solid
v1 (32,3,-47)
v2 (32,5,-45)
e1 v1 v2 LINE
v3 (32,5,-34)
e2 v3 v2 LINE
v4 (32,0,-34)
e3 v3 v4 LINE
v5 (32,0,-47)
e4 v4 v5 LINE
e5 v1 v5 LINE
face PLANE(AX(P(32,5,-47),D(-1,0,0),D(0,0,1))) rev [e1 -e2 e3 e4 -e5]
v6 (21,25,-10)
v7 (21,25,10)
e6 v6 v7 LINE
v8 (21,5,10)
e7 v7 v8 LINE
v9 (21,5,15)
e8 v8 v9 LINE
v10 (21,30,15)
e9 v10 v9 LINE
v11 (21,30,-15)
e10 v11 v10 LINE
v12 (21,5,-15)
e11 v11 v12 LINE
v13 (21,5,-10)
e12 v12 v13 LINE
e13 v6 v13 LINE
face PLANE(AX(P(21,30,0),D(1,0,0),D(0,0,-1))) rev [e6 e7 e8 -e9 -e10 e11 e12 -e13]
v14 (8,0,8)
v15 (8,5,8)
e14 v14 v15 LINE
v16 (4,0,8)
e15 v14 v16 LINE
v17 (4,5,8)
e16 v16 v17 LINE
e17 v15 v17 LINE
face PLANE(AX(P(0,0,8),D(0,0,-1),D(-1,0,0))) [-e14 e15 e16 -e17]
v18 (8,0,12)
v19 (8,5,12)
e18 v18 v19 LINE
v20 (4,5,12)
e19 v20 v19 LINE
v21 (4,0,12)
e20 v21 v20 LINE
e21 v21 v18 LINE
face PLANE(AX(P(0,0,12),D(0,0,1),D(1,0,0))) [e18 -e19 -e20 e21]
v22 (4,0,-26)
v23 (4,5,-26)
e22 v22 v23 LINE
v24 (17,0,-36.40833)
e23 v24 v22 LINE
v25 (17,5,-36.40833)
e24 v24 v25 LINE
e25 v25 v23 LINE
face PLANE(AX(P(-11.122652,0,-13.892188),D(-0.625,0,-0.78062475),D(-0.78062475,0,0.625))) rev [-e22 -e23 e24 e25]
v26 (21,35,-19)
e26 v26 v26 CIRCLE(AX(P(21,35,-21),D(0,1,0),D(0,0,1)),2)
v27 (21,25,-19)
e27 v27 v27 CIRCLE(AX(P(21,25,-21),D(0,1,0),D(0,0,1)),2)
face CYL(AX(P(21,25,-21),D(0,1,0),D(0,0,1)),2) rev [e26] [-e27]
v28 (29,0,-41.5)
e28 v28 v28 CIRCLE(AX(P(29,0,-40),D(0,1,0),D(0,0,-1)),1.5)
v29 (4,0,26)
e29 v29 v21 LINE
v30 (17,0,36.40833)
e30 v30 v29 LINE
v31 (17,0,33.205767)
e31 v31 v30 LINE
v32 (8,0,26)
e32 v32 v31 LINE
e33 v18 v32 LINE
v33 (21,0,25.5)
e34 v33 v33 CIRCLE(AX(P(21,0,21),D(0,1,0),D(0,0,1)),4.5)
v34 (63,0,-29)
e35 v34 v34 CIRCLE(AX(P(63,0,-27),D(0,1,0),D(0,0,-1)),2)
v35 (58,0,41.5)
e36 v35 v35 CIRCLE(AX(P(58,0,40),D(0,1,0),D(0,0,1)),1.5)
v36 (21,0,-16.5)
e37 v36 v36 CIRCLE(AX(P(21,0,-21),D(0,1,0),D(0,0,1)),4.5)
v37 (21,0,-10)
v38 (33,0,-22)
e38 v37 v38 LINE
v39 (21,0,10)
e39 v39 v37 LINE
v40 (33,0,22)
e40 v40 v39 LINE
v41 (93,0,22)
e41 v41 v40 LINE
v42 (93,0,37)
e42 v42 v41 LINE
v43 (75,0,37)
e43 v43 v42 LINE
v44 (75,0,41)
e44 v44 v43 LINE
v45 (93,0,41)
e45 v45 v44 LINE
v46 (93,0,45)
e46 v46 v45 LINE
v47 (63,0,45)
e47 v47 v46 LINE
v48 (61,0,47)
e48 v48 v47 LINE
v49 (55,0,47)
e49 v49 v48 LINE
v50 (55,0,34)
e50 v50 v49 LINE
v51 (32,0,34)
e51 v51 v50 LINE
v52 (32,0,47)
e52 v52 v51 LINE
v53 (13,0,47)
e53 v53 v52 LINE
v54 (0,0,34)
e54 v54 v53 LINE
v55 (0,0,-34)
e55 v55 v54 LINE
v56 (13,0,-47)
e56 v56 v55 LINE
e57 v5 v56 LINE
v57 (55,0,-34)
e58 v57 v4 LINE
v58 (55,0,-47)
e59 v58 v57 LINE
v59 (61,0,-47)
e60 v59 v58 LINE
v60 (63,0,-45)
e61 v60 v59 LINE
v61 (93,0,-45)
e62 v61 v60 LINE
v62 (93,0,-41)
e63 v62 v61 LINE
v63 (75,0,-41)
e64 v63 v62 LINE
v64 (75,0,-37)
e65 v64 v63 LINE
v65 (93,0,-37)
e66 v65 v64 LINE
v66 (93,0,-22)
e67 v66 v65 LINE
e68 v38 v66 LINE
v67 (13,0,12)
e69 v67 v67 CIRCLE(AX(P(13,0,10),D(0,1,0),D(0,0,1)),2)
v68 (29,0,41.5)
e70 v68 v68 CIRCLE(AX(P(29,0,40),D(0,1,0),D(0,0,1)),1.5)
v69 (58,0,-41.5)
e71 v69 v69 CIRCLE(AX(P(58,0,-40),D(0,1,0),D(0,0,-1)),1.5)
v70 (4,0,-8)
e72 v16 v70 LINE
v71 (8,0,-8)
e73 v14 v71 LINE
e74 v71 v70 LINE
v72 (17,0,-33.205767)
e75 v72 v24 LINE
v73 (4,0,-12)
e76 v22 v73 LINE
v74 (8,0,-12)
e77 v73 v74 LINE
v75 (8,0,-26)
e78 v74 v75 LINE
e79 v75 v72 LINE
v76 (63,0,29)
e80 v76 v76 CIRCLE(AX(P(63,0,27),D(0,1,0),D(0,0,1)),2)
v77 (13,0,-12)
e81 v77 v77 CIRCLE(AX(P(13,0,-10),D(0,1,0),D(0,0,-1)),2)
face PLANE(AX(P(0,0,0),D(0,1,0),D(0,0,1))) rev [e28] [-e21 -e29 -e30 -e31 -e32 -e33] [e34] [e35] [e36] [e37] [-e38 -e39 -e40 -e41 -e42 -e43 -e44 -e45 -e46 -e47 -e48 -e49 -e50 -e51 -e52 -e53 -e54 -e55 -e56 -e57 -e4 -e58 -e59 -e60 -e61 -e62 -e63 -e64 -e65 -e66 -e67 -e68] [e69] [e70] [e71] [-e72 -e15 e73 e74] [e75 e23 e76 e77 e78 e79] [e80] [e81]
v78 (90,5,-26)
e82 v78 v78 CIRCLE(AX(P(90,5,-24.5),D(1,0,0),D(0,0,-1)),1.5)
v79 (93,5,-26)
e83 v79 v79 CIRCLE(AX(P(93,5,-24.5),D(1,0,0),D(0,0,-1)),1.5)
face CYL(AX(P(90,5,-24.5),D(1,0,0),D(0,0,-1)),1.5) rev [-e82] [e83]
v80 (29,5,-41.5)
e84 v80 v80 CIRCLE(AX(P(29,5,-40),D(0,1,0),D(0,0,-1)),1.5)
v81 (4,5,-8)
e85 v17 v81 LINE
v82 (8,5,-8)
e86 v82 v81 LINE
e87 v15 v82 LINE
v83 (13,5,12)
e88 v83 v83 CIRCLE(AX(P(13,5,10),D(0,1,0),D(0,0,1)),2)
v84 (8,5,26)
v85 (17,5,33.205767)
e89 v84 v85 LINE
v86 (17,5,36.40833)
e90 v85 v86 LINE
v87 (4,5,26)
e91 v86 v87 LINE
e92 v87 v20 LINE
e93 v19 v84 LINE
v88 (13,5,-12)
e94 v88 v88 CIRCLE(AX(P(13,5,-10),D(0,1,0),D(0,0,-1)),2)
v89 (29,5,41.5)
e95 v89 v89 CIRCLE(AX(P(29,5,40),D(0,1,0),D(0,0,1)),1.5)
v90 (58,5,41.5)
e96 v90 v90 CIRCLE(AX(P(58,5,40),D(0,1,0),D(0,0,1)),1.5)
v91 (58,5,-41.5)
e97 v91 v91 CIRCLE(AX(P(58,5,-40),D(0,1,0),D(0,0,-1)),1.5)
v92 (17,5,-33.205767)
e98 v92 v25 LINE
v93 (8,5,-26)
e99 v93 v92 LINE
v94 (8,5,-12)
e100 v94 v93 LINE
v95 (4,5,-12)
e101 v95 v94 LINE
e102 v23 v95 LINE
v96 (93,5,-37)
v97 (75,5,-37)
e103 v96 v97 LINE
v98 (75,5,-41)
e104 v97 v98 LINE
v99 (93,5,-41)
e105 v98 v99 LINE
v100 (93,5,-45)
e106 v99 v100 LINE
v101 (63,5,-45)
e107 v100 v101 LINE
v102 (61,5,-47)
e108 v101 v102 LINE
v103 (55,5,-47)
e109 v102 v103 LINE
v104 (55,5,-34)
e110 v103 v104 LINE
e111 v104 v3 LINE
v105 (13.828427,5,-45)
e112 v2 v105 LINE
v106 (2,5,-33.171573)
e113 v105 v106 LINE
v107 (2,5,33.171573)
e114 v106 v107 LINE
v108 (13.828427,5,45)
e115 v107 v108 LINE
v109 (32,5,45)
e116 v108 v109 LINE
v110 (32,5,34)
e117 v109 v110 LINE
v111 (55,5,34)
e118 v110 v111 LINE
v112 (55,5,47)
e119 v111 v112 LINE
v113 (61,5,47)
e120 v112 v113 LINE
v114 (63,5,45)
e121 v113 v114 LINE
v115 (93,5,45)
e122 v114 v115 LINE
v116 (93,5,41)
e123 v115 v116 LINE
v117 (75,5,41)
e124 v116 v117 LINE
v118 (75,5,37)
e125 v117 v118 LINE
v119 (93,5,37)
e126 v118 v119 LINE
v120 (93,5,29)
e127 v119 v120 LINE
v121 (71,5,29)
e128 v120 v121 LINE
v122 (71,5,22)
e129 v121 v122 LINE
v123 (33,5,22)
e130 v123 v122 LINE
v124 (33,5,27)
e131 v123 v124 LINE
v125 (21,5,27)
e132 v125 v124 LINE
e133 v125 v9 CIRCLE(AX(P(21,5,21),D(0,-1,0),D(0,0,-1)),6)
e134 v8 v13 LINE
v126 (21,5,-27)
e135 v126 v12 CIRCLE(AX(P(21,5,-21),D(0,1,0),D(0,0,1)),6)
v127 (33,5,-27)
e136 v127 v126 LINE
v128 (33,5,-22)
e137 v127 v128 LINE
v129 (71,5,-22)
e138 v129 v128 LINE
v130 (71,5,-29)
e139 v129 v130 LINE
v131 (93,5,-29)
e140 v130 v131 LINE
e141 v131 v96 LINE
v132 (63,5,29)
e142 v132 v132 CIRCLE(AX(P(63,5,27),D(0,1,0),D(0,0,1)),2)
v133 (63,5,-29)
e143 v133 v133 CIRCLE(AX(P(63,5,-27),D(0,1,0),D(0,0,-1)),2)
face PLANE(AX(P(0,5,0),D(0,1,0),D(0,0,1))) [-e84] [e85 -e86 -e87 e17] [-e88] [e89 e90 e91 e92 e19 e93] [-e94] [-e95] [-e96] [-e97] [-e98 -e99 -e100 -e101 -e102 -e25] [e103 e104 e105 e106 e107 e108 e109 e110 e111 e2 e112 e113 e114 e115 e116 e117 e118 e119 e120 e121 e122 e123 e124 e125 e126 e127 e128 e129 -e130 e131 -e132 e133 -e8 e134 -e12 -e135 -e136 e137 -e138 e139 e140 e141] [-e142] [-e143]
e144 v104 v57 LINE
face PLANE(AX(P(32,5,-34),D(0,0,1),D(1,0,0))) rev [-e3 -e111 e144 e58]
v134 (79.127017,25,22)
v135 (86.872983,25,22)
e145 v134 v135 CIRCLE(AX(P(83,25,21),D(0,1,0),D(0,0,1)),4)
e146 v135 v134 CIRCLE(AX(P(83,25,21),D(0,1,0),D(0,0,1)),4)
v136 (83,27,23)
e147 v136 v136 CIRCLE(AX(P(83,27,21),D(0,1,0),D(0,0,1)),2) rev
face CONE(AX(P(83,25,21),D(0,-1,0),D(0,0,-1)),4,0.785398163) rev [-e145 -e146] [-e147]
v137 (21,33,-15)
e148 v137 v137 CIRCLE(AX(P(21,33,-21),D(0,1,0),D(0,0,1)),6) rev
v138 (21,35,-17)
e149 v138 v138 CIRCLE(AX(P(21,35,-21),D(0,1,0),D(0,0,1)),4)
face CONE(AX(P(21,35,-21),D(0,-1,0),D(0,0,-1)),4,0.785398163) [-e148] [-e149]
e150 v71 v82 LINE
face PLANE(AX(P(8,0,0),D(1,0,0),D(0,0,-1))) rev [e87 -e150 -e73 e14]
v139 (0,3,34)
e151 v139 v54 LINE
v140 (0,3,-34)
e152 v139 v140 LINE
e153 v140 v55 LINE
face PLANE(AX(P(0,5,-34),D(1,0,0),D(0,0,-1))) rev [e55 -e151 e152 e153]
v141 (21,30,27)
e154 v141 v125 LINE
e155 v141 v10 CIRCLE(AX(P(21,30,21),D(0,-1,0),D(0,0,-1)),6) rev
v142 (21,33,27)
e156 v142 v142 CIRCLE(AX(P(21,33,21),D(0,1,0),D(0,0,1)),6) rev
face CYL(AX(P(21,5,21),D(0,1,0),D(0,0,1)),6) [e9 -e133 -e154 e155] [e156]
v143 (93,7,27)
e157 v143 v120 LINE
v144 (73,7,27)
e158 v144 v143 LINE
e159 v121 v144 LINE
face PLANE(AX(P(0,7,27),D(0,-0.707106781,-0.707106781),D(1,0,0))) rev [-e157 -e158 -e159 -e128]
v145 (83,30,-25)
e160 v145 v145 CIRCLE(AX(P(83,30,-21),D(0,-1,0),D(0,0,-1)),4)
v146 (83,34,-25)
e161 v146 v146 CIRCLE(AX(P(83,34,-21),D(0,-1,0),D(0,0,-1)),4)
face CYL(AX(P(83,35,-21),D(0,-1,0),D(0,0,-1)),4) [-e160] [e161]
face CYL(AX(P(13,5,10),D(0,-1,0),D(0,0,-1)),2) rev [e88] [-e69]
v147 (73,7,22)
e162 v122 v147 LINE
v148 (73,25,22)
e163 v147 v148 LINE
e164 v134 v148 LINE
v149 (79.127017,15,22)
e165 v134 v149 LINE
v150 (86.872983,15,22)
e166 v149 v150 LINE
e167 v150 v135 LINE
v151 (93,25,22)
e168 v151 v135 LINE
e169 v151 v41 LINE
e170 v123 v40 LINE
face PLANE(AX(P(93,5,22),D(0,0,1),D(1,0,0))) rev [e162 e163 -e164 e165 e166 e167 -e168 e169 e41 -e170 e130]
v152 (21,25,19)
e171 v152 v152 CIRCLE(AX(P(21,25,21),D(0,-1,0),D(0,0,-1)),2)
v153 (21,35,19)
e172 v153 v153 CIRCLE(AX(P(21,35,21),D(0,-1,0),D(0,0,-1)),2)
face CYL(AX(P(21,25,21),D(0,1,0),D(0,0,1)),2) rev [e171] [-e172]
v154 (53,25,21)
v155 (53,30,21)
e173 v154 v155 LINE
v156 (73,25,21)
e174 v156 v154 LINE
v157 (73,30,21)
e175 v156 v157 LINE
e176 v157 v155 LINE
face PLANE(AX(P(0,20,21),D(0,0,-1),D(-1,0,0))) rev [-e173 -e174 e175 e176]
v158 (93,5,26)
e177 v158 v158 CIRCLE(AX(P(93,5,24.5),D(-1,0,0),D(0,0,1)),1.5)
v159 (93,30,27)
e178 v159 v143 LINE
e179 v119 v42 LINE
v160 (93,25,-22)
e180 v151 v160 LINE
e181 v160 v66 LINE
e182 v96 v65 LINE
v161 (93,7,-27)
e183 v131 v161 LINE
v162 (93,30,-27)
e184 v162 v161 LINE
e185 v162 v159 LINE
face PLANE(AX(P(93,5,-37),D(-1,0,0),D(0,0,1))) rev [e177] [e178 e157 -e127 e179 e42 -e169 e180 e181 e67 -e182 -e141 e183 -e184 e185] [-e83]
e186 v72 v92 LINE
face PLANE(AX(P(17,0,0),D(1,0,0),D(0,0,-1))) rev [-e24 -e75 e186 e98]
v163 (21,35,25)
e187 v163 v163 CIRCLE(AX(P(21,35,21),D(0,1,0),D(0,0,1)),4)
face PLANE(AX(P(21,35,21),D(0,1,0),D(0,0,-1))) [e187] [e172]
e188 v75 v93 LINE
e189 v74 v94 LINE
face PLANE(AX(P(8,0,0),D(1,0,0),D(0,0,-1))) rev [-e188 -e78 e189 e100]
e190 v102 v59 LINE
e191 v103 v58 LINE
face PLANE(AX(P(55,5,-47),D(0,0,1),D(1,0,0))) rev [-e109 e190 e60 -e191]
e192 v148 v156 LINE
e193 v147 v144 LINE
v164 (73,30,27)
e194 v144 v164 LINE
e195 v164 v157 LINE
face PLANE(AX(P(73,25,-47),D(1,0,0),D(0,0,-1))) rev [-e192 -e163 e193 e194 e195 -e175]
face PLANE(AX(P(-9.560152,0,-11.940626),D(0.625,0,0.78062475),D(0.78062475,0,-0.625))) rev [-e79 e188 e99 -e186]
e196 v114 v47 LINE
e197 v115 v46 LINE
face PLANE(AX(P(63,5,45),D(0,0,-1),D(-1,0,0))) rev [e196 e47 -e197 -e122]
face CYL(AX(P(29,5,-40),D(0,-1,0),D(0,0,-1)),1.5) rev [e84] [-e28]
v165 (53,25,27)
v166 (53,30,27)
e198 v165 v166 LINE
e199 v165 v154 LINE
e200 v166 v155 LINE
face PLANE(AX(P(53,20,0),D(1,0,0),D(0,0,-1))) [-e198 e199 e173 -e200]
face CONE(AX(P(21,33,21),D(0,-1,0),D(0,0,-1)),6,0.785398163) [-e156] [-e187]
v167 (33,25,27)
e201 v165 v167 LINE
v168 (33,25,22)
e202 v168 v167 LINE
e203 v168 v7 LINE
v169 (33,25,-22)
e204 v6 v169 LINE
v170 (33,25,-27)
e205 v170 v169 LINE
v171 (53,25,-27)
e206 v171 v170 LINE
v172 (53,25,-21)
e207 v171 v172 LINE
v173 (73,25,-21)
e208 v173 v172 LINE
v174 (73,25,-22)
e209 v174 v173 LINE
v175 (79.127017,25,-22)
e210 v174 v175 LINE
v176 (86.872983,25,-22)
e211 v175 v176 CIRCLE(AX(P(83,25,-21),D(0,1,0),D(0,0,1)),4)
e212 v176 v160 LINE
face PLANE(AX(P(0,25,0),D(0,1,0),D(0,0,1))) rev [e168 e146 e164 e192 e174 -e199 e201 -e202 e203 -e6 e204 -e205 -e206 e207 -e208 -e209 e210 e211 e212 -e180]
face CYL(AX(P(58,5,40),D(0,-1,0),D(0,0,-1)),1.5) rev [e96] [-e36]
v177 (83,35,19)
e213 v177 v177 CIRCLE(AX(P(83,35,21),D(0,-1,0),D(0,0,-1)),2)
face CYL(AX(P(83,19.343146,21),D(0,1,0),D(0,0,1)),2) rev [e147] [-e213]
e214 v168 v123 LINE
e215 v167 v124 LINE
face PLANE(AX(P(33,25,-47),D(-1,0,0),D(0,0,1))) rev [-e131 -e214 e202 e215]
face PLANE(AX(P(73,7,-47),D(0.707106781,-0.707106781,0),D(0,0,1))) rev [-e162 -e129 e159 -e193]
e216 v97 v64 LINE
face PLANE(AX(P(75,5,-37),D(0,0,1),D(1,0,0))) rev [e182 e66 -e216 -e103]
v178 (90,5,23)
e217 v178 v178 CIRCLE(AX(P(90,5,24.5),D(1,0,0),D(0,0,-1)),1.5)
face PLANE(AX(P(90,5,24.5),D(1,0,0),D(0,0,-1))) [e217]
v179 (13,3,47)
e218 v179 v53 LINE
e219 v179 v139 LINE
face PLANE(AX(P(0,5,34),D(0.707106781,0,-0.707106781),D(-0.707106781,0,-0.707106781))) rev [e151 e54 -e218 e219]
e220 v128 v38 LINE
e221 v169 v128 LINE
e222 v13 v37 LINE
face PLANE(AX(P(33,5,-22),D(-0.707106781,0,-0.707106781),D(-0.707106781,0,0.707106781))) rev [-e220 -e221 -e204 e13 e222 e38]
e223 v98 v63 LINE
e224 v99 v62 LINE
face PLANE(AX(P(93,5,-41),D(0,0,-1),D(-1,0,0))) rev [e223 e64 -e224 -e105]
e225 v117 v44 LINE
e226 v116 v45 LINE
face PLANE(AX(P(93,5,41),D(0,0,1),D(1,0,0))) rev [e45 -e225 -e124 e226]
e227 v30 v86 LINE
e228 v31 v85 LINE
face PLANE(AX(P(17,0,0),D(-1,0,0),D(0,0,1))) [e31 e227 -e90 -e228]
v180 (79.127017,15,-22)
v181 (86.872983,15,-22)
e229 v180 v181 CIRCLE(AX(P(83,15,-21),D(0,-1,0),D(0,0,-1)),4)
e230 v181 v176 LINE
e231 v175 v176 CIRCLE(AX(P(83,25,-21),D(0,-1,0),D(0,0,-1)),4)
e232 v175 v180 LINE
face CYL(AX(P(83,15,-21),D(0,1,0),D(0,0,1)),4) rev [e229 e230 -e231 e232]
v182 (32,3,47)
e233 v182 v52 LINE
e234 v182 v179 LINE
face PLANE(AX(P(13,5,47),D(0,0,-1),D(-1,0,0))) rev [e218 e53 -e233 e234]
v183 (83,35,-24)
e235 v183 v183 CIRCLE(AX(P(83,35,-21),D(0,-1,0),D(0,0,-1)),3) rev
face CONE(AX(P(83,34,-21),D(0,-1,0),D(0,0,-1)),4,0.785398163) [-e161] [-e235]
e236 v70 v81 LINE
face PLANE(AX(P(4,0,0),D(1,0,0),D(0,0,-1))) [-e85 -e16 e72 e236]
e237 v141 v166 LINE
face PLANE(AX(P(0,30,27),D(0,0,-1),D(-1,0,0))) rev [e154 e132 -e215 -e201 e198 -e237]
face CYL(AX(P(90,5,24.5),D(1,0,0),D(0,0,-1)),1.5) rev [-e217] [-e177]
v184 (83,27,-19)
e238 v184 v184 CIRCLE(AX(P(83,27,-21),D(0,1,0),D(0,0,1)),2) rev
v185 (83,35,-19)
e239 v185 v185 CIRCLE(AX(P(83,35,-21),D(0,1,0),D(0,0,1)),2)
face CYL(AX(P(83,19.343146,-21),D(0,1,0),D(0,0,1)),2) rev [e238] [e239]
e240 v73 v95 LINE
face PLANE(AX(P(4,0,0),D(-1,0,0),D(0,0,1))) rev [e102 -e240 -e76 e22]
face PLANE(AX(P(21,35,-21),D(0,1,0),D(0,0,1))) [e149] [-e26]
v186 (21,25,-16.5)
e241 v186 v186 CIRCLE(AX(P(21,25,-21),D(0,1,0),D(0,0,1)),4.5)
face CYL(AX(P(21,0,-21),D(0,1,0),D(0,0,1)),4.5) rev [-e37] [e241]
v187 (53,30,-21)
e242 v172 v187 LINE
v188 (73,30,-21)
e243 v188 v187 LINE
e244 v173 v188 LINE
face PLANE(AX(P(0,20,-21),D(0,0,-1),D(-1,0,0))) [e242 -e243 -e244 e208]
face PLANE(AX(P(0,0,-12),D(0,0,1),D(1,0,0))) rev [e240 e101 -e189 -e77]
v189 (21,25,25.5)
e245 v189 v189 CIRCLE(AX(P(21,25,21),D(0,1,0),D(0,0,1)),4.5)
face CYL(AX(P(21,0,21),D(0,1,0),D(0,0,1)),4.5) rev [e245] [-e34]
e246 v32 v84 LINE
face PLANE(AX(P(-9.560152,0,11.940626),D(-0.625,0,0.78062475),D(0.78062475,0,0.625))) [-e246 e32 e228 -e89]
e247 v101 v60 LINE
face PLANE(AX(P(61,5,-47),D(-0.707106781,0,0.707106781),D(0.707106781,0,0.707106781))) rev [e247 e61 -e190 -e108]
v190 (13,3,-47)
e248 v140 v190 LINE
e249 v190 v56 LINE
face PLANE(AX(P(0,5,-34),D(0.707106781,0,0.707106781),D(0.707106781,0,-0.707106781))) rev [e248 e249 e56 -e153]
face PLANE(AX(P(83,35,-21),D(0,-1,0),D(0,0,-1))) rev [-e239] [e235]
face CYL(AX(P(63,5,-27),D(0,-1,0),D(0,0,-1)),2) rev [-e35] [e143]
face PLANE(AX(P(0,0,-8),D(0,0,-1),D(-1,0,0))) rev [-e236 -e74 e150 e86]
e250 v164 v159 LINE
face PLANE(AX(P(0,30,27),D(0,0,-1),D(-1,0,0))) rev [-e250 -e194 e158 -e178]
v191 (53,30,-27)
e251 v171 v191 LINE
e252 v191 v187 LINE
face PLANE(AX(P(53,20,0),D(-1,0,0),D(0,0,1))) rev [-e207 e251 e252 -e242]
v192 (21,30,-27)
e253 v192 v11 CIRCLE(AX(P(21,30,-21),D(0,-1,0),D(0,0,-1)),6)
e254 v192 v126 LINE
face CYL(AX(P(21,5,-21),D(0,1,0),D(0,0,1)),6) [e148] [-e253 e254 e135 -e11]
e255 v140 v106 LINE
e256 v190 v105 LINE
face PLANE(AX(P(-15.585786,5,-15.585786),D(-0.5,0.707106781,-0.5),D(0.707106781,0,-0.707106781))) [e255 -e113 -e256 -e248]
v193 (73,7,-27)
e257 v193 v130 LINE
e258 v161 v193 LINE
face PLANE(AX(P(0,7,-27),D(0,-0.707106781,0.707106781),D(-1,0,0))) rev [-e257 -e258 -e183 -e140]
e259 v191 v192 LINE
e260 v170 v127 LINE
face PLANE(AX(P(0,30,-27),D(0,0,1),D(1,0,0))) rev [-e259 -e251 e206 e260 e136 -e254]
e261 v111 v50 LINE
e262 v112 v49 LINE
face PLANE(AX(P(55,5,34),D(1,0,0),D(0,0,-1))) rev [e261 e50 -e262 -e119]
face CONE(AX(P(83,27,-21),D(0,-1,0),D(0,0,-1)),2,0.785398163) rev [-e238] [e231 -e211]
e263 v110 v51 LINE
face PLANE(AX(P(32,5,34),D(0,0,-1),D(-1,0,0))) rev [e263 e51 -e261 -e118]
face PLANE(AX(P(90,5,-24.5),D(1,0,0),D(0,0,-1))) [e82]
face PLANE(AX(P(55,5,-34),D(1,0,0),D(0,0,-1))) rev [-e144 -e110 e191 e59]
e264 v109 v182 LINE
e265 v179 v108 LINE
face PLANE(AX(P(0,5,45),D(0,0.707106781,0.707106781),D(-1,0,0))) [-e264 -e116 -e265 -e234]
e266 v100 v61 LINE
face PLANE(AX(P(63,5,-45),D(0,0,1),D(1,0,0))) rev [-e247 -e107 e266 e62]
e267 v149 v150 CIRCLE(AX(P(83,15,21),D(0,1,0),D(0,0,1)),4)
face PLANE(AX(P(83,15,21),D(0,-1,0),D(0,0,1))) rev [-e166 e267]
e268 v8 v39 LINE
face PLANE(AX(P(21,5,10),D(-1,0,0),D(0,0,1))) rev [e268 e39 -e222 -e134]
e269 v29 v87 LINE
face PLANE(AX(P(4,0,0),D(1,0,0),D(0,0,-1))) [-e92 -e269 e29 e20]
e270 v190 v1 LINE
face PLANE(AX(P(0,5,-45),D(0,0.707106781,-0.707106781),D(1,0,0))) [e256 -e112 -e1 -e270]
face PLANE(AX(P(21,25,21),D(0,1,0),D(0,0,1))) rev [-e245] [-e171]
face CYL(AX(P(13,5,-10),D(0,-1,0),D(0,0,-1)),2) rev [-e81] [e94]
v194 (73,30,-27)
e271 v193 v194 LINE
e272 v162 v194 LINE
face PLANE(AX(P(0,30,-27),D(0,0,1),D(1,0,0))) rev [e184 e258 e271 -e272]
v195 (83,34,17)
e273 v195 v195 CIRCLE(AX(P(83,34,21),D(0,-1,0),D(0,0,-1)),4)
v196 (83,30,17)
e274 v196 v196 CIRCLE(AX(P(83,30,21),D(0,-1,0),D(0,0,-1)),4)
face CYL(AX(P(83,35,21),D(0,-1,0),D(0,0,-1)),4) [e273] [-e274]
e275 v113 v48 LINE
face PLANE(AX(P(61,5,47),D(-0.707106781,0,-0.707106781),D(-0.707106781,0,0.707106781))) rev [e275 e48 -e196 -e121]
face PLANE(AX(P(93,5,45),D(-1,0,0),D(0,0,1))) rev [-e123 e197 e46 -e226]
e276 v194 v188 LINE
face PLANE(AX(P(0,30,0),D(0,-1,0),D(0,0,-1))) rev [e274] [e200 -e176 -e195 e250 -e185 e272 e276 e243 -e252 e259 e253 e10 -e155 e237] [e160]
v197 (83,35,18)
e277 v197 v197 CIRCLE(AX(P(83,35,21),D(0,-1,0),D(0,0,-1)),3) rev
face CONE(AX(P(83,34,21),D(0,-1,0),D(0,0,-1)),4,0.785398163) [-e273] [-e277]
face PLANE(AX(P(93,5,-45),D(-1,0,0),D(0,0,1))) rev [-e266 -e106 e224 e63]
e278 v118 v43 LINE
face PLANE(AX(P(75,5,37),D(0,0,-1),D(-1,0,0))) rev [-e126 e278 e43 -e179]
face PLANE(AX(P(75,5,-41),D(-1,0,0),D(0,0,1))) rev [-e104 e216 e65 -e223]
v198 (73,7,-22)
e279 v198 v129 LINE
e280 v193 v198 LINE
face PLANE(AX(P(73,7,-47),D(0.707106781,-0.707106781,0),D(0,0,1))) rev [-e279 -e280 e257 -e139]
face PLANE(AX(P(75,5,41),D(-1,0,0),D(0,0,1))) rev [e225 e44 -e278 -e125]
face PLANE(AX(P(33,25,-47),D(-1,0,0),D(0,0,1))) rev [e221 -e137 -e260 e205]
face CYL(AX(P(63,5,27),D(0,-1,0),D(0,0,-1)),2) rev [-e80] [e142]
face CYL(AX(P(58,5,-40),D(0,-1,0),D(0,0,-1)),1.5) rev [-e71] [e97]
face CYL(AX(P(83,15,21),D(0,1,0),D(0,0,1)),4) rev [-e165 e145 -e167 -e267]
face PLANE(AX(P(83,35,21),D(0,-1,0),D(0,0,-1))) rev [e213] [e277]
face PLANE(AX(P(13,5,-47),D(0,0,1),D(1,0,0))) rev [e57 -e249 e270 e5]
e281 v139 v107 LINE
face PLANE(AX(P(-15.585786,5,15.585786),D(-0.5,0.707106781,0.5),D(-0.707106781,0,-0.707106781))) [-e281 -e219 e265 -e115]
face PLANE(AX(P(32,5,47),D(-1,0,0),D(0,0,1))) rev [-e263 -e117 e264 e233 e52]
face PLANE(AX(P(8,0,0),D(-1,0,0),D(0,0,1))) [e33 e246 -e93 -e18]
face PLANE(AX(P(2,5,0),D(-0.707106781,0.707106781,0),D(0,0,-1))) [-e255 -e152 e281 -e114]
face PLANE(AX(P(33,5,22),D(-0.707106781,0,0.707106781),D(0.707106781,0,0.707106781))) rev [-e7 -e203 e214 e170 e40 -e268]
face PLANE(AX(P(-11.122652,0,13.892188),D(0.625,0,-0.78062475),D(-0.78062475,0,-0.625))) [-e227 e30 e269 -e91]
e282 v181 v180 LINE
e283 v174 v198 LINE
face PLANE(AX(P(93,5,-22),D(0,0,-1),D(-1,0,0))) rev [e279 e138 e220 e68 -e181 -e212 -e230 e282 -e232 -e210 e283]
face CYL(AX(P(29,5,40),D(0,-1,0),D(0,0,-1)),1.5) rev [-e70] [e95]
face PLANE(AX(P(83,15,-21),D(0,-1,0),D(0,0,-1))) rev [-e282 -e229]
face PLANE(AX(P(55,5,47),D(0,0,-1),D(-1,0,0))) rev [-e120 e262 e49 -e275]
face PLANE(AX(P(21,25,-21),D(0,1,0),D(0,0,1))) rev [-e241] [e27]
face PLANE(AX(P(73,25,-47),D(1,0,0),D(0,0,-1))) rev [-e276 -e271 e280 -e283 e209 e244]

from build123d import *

# Parameters (mm, degrees)
SKETCH1_R           = 2
SKETCH1_R_2         = 1.5
BOSS_EXTRUDE1_DEPTH = 5
SKETCH2_W           = 4
SKETCH2_H           = 16
CUT_EXTRUDE1_DEPTH  = 5
BOSS_EXTRUDE3_DEPTH = 25
SKETCH4_W           = 72
SKETCH4_H           = 54
BOSS_EXTRUDE4_DEPTH = 5
SKETCH5_W           = 40
SKETCH5_H           = 20
CUT_EXTRUDE2_DEPTH  = 123.576506721
SKETCH6_W           = 20
SKETCH6_H           = 6
CUT_EXTRUDE4_DEPTH  = 10
BOSS_EXTRUDE5_START = -5
SKETCH7_R           = 4
BOSS_EXTRUDE5_DEPTH = 5
SKETCH8_R           = 2
CUT_EXTRUDE5_DEPTH  = 10
CUT_EXTRUDE6_START  = 10
SKETCH9_R           = 4
CUT_EXTRUDE6_DEPTH  = 10
BOSS_EXTRUDE6_START = 5
SKETCH10_R          = 6
BOSS_EXTRUDE6_DEPTH = 30
SKETCH11_R          = 2
CUT_EXTRUDE7_DEPTH  = 10
CUT_EXTRUDE8_START  = 20
SKETCH12_R          = 4.5
CUT_EXTRUDE8_DEPTH  = 129.434311913
SKETCH14_R          = 4.5
CUT_EXTRUDE11_DEPTH = 108.158760724
SKETCH13_R          = 1.5
BOSS_EXTRUDE8_DEPTH = 3
CHAMFER2_SIZE       = 1
CHAMFER3_SIZE       = 2
CHAMFER4_SIZE       = 2
CHAMFER5_SIZE       = 2
CUT_EXTRUDE15_START = -3
SKETCH13_3_R        = 1.5
CUT_EXTRUDE15_DEPTH = 3
CUT_EXTRUDE18_START = 3
SKETCH13_5_R        = 1.5
CUT_EXTRUDE18_DEPTH = 6
SKETCH23_R          = 1.5
CUT_EXTRUDE19_DEPTH = 6


with BuildPart() as part:
    # Sketch1 → Boss-Extrude1 (new body)
    with BuildSketch(Plane(origin=(0, 0, 0), x_dir=(1, 0, 0), z_dir=(0, 1, 0))):
        Polygon((0, 34), (0, -34), (13, -47), (32, -47), (32, -34), (55, -34), (55, -47), (61, -47), (63, -45), (93, -45), (93, -41), (75, -41), (75, -37), (93, -37), (93, -22), (33, -22), (21, -10), (21, 10), (33, 22), (93, 22), (93, 37), (75, 37), (75, 41), (93, 41), (93, 45), (63, 45), (61, 47), (55, 47), (55, 34), (32, 34), (32, 47), (13, 47), align=None)
        with Locations(Location((13, -10, 0), (0, 0, 270))):
            Circle(SKETCH1_R, mode=Mode.SUBTRACT)
        with Locations(Location((29, -40, 0), (0, 0, 270))):
            Circle(SKETCH1_R_2, mode=Mode.SUBTRACT)
        with Locations(Location((58, -40, 0), (0, 0, 270))):
            Circle(SKETCH1_R_2, mode=Mode.SUBTRACT)
        with Locations(Location((63, -27, 0), (0, 0, 270))):
            Circle(SKETCH1_R, mode=Mode.SUBTRACT)
        with Locations(Location((13, 10, 0), (0, 0, 90))):
            Circle(SKETCH1_R, mode=Mode.SUBTRACT)
        with Locations(Location((29, 40, 0), (0, 0, 90))):
            Circle(SKETCH1_R_2, mode=Mode.SUBTRACT)
        with Locations(Location((58, 40, 0), (0, 0, 90))):
            Circle(SKETCH1_R_2, mode=Mode.SUBTRACT)
        with Locations(Location((63, 27, 0), (0, 0, 90))):
            Circle(SKETCH1_R, mode=Mode.SUBTRACT)
    extrude(amount=BOSS_EXTRUDE1_DEPTH)

    # Sketch2 → Cut-Extrude1 (cut)
    with BuildSketch(Plane(origin=(0, 5, 0), x_dir=(1, 0, 0), z_dir=(0, 1, 0))):
        Polygon((17, 33.205766921), (17, 36.408329997), (4, 26), (4, 12), (8, 12), (8, 26), align=None)
        with Locations((6, 0)):
            Rectangle(SKETCH2_W, SKETCH2_H)
        Polygon((17, -33.205766921), (17, -36.408329997), (4, -26), (4, -12), (8, -12), (8, -26), align=None)
    extrude(amount=-CUT_EXTRUDE1_DEPTH, mode=Mode.SUBTRACT)

    # Sketch3 → Boss-Extrude3 (add)
    with BuildSketch(Plane(origin=(0, 5, 0), x_dir=(1, 0, 0), z_dir=(0, 1, 0))):
        Polygon((21, 27), (21, 10), (33, 22), (93, 22), (93, 27), align=None)
        Polygon((93, -27), (93, -22), (33, -22), (21, -10), (21, -27), align=None)
    extrude(amount=BOSS_EXTRUDE3_DEPTH)

    # Sketch4 → Boss-Extrude4 (add)
    with BuildSketch(Plane(origin=(0, 30, 0), x_dir=(1, 0, 0), z_dir=(0, 1, 0))):
        with Locations((57, 0)):
            Rectangle(SKETCH4_W, SKETCH4_H)
    extrude(amount=-BOSS_EXTRUDE4_DEPTH)

    # Sketch5 → Cut-Extrude2 (cut, through all)
    with BuildSketch(Plane.XY.offset(27)):
        with Locations((53, 15)):
            Rectangle(SKETCH5_W, SKETCH5_H)
    extrude(amount=-CUT_EXTRUDE2_DEPTH, mode=Mode.SUBTRACT)

    # Sketch6 → Cut-Extrude4 (cut)
    with BuildSketch(Plane(origin=(0, 30, 0), x_dir=(1, 0, 0), z_dir=(0, 1, 0))):
        with Locations((63, 24)):
            Rectangle(SKETCH6_W, SKETCH6_H)
        with Locations((63, -24)):
            Rectangle(SKETCH6_W, SKETCH6_H)
    extrude(amount=-CUT_EXTRUDE4_DEPTH, mode=Mode.SUBTRACT)

    # Sketch7 → Boss-Extrude5 (add)
    with BuildSketch(Plane.XZ.offset(-25).offset(BOSS_EXTRUDE5_START)):
        with Locations(Location((83, 21, 0), (0, 0, 270))):
            Circle(SKETCH7_R)
        with Locations(Location((83, -21, 0), (0, 0, 270))):
            Circle(SKETCH7_R)
    extrude(amount=-BOSS_EXTRUDE5_DEPTH)

    # Sketch8 → Cut-Extrude5 (cut)
    with BuildSketch(Plane(origin=(0, 35, 0), x_dir=(1, 0, 0), z_dir=(0, 1, 0))):
        with Locations(Location((83, 21, 0), (0, 0, 270))):
            Circle(SKETCH8_R)
    cut_extrude5 = extrude(amount=-CUT_EXTRUDE5_DEPTH, mode=Mode.SUBTRACT)

    # Sketch9 → Cut-Extrude6 (cut)
    with BuildSketch(Plane.XZ.offset(-25).offset(CUT_EXTRUDE6_START)):
        with Locations(Location((83, -21, 0), (0, 0, 270))):
            Circle(SKETCH9_R)
    cut_extrude6 = extrude(amount=-CUT_EXTRUDE6_DEPTH, mode=Mode.SUBTRACT)

    # Sketch10 → Boss-Extrude6 (add)
    with BuildSketch(Plane(origin=(0, 30, 0), x_dir=(1, 0, 0), z_dir=(0, 1, 0)).offset(BOSS_EXTRUDE6_START)):
        with Locations(Location((21, 21, 0), (0, 0, 270))):
            Circle(SKETCH10_R)
    boss_extrude6 = extrude(amount=-BOSS_EXTRUDE6_DEPTH)

    # Sketch11 → Cut-Extrude7 (cut)
    with BuildSketch(Plane(origin=(0, 35, 0), x_dir=(1, 0, 0), z_dir=(0, 1, 0))):
        with Locations(Location((21, 21, 0), (0, 0, 270))):
            Circle(SKETCH11_R)
    cut_extrude7 = extrude(amount=-CUT_EXTRUDE7_DEPTH, mode=Mode.SUBTRACT)

    # Sketch12 → Cut-Extrude8 (cut, through all)
    with BuildSketch(Plane(origin=(0, 5, 0), x_dir=(1, 0, 0), z_dir=(0, 1, 0)).offset(CUT_EXTRUDE8_START)):
        with Locations(Location((21, 21, 0), (0, 0, 270))):
            Circle(SKETCH12_R)
    extrude(amount=-CUT_EXTRUDE8_DEPTH, mode=Mode.SUBTRACT)

    # Mirror11: Cut-Extrude5, Cut-Extrude6 across plane
    add(cut_extrude5.mirror(Plane.XY), mode=Mode.SUBTRACT)
    add(cut_extrude6.mirror(Plane.XY), mode=Mode.SUBTRACT)

    # Mirror12: Boss-Extrude6 across plane
    add(boss_extrude6.mirror(Plane.XY))

    # Mirror16: Cut-Extrude7 across plane
    add(cut_extrude7.mirror(Plane.XY), mode=Mode.SUBTRACT)

    # Sketch14 → Cut-Extrude11 (cut, through all)
    with BuildSketch(Plane(origin=(0, 25, 0), x_dir=(1, 0, 0), z_dir=(0, 1, 0))):
        with Locations(Location((21, -21, 0), (0, 0, 270))):
            Circle(SKETCH14_R)
    extrude(amount=-CUT_EXTRUDE11_DEPTH, mode=Mode.SUBTRACT)

    # Sketch13 → Boss-Extrude8 (add)
    with BuildSketch(Plane(origin=(93, 0, 0), x_dir=(0, 0, -1), z_dir=(1, 0, 0))):
        with Locations(Location((24.5, 5, 0), (0, 0, 180))):
            Circle(SKETCH13_R)
    boss_extrude8 = extrude(amount=BOSS_EXTRUDE8_DEPTH)

    # Mirror19: Boss-Extrude8 across plane
    add(boss_extrude8.mirror(Plane.XY))

    # Chamfer2
    chamfer2_edges = [part.edges().sort_by_distance(p)[0] for p in [
        (83, 35, 25),
        (83, 35, -17),
    ]]
    chamfer(chamfer2_edges, length=CHAMFER2_SIZE)

    # Chamfer3
    chamfer3_edges = [part.edges().sort_by_distance(p)[0] for p in [
        (22.5, 5, -47),
        (6.5, 5, -40.5),
        (0, 5, 0),
        (6.5, 5, 40.5),
        (21, 35, -27),
        (21, 35, 27),
        (22.5, 5, 47),
    ]]
    chamfer(chamfer3_edges, length=CHAMFER3_SIZE)

    # Chamfer4
    chamfer4_edges = [part.edges().sort_by_distance(p)[0] for p in [
        (83, 5, -27),
        (83, 5, 27),
        (73, 5, 24.5),
        (73, 5, -24.5),
    ]]
    chamfer(chamfer4_edges, length=CHAMFER4_SIZE)

    # Chamfer5
    chamfer5_edges = [part.edges().sort_by_distance(p)[0] for p in [
        (83, 25, -23),
        (83, 25, 23),
    ]]
    chamfer(chamfer5_edges, length=CHAMFER5_SIZE - 0.0001)  # a hair under: the kernel refuses the full size

    # Sketch13<3> → Cut-Extrude15 (cut)
    with BuildSketch(Plane(origin=(93, 0, 0), x_dir=(0, 0, -1), z_dir=(1, 0, 0)).offset(CUT_EXTRUDE15_START)):
        with Locations((24.5, 5)):
            Circle(SKETCH13_3_R)
    extrude(amount=CUT_EXTRUDE15_DEPTH, mode=Mode.SUBTRACT)


with BuildPart() as cut_extrude15_piece_1:
    # of the separate pieces the step leaves, piece 1, a body of its own (cut_extrude15_pieces)
    add(part.part.solids().sort_by_distance((83, 25, -17.0001))[0])

    # Sketch23 → Cut-Extrude19 (cut)
    with BuildSketch(Plane(origin=(96, 0, 0), x_dir=(0, 0, -1), z_dir=(1, 0, 0))):
        with Locations((-24.5, 5)):
            Circle(SKETCH23_R)
    extrude(amount=-CUT_EXTRUDE19_DEPTH, mode=Mode.SUBTRACT)


with BuildPart() as cut_extrude15_piece_2:
    # of the separate pieces the step leaves, piece 2, a body of its own (cut_extrude15_pieces)
    add(part.part.solids().sort_by_distance((96, 5, -23))[0])

    # Sketch13<5> → Cut-Extrude18 (cut)
    with BuildSketch(Plane(origin=(93, 0, 0), x_dir=(0, 0, -1), z_dir=(1, 0, 0)).offset(CUT_EXTRUDE18_START)):
        with Locations((24.5, 5)):
            Circle(SKETCH13_5_R)
    extrude(amount=-CUT_EXTRUDE18_DEPTH, mode=Mode.SUBTRACT)


solid = cut_extrude15_piece_1.part
